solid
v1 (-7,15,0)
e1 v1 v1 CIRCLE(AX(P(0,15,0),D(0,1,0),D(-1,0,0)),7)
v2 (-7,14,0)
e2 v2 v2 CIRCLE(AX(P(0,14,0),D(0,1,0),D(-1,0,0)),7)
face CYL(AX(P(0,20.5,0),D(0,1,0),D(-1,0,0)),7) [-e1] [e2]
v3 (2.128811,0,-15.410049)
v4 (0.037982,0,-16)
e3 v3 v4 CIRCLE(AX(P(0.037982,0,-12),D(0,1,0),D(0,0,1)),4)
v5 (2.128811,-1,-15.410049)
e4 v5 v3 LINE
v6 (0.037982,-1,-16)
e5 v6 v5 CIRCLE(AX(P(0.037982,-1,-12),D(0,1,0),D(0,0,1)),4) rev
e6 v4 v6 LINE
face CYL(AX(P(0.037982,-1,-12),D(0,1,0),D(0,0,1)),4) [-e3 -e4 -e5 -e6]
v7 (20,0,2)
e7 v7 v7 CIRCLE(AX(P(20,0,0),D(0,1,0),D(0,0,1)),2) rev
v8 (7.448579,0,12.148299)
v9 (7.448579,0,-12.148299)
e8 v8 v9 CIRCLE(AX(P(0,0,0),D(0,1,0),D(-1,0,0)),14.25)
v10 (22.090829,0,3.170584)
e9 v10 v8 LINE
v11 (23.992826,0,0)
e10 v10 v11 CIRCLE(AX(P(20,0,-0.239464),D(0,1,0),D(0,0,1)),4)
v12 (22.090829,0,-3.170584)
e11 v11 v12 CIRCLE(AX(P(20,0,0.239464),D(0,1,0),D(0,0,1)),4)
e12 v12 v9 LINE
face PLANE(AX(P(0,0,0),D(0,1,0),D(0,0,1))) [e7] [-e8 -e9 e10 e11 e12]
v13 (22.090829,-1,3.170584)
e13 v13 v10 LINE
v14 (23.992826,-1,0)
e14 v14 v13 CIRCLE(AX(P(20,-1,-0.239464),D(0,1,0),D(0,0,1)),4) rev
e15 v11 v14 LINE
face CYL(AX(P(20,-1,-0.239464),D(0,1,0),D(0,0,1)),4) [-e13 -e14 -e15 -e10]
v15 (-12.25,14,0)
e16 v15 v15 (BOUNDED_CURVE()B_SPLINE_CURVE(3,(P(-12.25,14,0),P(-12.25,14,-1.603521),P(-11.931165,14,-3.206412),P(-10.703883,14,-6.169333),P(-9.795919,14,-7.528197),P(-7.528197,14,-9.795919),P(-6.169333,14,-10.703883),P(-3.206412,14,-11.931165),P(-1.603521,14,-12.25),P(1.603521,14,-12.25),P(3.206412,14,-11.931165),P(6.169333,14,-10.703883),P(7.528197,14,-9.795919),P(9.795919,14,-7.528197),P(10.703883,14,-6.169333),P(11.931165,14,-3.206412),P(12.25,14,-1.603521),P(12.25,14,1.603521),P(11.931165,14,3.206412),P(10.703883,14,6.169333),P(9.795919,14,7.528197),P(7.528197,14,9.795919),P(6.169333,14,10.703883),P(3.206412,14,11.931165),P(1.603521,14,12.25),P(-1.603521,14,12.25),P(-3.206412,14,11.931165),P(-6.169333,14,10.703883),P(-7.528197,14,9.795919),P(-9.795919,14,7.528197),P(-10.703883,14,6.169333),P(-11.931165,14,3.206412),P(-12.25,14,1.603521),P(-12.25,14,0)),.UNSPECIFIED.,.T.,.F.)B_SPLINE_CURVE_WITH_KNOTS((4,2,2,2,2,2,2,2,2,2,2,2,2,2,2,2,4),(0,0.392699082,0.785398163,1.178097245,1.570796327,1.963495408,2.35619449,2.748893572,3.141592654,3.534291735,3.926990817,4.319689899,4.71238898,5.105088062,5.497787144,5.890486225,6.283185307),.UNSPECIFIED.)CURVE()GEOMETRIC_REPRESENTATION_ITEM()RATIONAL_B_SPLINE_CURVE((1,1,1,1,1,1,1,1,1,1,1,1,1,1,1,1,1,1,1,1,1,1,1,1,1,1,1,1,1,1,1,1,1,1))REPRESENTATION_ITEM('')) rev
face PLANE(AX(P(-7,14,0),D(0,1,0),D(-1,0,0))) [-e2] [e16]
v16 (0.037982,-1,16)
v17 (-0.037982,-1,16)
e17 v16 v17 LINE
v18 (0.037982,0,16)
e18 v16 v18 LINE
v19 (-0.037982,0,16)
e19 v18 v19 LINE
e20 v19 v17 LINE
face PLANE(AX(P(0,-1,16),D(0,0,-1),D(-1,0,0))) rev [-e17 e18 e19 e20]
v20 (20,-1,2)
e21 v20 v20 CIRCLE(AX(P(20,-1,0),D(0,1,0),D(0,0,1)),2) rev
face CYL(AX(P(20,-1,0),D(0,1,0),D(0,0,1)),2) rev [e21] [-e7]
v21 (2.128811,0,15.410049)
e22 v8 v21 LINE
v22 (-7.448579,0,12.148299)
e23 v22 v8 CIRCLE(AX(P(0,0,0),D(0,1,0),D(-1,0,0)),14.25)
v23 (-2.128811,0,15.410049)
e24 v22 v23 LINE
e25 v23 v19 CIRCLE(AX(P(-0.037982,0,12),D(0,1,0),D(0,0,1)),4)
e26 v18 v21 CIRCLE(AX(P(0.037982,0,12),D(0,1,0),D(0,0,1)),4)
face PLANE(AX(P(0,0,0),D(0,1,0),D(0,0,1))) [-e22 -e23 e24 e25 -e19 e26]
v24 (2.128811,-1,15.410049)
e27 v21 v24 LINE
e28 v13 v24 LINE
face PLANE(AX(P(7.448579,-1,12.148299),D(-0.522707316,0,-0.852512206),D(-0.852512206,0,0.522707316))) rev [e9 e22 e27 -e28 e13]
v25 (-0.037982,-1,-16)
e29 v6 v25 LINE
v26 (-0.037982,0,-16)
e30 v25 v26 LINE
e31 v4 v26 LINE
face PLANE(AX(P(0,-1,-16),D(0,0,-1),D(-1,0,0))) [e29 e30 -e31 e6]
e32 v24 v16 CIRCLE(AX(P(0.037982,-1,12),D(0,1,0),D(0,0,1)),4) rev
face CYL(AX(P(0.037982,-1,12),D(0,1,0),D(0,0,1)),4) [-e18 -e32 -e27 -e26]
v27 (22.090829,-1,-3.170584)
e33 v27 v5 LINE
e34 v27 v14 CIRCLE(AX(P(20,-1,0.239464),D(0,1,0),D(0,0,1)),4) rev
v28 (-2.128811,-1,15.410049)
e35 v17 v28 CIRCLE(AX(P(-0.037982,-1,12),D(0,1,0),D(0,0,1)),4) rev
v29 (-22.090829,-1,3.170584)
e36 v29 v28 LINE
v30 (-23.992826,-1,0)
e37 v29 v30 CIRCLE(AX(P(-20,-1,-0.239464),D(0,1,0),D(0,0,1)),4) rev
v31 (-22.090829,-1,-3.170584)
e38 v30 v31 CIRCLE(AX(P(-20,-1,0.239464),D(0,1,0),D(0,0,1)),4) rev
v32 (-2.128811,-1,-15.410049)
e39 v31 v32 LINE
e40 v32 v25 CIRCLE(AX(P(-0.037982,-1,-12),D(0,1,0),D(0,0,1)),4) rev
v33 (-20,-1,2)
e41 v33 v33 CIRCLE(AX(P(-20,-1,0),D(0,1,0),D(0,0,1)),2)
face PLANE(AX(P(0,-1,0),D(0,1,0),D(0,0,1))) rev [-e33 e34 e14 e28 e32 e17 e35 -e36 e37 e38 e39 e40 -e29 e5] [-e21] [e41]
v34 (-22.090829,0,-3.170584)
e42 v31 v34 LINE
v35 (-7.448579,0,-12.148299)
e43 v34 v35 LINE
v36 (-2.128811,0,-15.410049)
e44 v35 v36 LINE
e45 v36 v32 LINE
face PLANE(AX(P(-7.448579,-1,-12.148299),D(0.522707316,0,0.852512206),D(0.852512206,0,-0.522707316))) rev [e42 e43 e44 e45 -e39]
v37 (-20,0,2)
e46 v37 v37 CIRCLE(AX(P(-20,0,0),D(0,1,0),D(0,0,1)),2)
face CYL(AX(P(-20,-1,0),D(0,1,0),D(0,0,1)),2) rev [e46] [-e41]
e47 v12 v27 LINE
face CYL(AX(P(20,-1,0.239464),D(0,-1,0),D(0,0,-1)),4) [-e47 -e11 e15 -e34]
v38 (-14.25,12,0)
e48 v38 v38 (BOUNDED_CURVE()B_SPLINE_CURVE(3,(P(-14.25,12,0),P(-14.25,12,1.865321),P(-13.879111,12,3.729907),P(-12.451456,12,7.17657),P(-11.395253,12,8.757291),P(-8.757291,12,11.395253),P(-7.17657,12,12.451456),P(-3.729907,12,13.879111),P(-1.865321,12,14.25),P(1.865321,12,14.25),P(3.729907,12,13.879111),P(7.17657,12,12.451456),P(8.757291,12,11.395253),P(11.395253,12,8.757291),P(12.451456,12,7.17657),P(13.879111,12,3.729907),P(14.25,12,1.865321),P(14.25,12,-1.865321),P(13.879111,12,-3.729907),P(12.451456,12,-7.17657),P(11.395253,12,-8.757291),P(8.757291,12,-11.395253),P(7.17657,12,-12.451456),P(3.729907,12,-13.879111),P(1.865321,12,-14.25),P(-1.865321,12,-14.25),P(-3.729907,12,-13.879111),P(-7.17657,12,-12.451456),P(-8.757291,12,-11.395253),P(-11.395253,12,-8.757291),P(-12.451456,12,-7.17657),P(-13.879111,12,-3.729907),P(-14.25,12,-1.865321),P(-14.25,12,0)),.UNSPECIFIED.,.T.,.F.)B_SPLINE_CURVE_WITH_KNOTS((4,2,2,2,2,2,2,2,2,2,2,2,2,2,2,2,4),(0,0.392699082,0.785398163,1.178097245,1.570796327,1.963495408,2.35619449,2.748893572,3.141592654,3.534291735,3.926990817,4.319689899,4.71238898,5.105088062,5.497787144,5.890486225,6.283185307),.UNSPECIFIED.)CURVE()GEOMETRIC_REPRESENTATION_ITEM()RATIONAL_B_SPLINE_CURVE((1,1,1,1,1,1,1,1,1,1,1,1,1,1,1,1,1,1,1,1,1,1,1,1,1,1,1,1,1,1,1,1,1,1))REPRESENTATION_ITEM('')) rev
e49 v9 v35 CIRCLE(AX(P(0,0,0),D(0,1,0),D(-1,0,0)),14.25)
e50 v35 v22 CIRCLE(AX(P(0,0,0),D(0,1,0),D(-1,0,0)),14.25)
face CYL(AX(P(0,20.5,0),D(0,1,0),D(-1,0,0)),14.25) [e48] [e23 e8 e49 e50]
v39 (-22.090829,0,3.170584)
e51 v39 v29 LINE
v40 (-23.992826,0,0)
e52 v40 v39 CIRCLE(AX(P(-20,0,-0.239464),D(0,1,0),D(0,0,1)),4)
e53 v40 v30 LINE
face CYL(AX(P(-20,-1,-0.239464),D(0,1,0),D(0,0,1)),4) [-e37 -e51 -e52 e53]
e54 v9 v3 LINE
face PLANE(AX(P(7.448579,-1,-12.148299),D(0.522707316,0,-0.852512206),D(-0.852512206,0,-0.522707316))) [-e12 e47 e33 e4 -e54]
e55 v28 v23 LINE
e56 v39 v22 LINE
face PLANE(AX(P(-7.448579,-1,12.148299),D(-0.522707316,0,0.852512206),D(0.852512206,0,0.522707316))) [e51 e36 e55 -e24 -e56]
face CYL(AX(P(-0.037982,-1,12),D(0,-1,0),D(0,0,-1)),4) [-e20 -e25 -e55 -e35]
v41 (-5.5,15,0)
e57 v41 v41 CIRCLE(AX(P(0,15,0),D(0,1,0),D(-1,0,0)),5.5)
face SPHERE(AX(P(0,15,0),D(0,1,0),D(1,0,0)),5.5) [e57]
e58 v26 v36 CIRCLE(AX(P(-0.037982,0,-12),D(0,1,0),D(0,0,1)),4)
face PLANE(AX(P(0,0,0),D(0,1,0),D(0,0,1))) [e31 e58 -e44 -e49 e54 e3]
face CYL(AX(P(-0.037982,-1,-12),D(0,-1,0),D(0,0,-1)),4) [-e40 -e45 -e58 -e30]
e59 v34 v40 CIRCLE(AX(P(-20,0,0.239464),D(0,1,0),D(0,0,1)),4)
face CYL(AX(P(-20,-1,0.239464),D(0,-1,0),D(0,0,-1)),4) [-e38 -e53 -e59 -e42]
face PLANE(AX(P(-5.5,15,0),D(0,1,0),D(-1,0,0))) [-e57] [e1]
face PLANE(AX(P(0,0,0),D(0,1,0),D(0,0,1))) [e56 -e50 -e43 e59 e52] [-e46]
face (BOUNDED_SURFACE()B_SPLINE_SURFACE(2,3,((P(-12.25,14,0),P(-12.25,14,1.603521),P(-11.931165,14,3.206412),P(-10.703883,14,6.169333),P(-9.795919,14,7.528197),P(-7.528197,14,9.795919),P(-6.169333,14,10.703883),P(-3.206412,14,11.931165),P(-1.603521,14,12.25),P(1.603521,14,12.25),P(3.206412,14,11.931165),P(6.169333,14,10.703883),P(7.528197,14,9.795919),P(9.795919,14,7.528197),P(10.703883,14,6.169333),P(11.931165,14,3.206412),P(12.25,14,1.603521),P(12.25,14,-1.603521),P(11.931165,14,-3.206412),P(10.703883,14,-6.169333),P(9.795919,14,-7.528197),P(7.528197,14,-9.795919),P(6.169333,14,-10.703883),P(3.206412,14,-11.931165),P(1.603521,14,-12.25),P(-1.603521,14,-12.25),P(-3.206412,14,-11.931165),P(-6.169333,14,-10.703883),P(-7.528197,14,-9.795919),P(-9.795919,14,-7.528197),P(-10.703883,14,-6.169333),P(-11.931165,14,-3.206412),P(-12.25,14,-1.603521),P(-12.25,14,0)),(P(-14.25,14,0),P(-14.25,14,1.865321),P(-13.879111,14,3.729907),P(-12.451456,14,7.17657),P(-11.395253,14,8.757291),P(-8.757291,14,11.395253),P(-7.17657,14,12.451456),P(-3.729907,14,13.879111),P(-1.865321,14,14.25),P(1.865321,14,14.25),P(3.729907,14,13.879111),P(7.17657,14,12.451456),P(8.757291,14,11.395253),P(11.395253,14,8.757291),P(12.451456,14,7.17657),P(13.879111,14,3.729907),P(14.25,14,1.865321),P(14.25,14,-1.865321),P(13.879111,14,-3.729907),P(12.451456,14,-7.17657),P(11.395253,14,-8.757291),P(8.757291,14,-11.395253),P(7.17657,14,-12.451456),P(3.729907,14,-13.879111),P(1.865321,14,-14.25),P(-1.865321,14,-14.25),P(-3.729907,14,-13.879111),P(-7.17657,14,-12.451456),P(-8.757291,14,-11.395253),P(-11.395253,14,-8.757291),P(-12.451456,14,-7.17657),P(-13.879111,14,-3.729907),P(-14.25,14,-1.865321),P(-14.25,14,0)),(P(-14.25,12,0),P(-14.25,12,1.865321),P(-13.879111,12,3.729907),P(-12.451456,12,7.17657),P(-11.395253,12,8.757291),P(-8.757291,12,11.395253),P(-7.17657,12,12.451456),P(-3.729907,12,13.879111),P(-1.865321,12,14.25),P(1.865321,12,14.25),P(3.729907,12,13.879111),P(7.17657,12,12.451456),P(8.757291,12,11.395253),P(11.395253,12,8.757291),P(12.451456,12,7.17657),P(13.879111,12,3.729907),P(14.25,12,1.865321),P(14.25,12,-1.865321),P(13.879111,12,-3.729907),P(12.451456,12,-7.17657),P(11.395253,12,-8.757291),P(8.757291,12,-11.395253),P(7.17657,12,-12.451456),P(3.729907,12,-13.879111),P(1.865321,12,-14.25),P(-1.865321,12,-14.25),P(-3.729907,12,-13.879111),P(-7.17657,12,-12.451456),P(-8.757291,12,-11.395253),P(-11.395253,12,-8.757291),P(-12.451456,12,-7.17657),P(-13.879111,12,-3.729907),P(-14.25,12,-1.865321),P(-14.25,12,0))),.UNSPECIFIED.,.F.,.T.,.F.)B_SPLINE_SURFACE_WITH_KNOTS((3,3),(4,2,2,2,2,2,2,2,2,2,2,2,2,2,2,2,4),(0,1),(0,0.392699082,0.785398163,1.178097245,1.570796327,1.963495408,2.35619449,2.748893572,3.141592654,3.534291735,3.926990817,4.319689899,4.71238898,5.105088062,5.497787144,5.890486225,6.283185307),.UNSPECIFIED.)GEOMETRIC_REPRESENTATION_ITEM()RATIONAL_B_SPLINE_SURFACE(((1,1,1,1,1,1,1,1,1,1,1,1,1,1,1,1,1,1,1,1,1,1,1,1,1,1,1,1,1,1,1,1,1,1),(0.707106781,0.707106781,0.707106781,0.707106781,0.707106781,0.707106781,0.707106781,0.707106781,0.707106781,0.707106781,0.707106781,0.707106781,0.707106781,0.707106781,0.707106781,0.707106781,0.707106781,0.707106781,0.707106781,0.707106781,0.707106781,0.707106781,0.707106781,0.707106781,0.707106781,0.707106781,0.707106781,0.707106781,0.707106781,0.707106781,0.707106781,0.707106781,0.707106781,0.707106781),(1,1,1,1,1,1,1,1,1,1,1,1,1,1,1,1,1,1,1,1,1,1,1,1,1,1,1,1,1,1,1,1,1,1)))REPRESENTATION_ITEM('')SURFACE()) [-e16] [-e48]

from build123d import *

# Parameters (mm, degrees)
FILLET_1_R      = 2
SKETCH_2_R      = 2
EXTRUDE_1_DEPTH = 1
FILLET_2_R      = 4


with BuildPart() as part:
    # 스케치1 → 회전1 (revolve)
    with BuildSketch(Plane.XY):
        with BuildLine():
            Line((-5.5, 15), (-7, 15))
            Line((-7, 15), (-7, 14))
            Line((-7, 14), (-14.25, 14))
            Line((-14.25, 14), (-14.25, 0))
            Line((-14.25, 0), (0, 0))
            Line((0, 0), (0, 20.5))
            ThreePointArc((0, 20.5), (-3.889087297, 18.889087297), (-5.5, 15))
        make_face()
    revolve(axis=Axis((0, 20.5, 0), (0, -1, 0)))

    # 필렛1
    fillet_1_edges = [part.edges().sort_by_distance(p)[0] for p in [
        (14.25, 14, 0),
    ]]
    fillet(fillet_1_edges, radius=FILLET_1_R)

    # 스케치2 → 보스-돌출1 (add)
    with BuildSketch(Plane(origin=(0, 0, 0), x_dir=(1, 0, 0), z_dir=(0, 1, 0))):
        Polygon((-1.166627447, 16), (-24, 2), (-24, -2), (-1.166627447, -16), (1.166627447, -16), (24, -2), (24, 2), (1.166627447, 16), align=None)
        with Locations(Location((-20, 0, 0), (0, 0, 270))):
            Circle(SKETCH_2_R, mode=Mode.SUBTRACT)
        with Locations(Location((20, 0, 0), (0, 0, 270))):
            Circle(SKETCH_2_R, mode=Mode.SUBTRACT)
    extrude(amount=-EXTRUDE_1_DEPTH)

    # 필렛2
    # the kernel refuses this fillet: 4 mm, written as the material it takes off along each edge
    with BuildSketch(Plane(origin=(24, 5.598660997, -2), x_dir=(-0.8525122061525764, 0, -0.5227073161539516), z_dir=(0, -1, 0)), Plane(origin=(24, 5.598660997, 2), x_dir=(0, 0, -1), z_dir=(0, -1, 0)), Plane(origin=(-24, 5.598660997, 2), x_dir=(0.852512206152576, 0, 0.5227073161539524), z_dir=(0, -1, 0)), Plane(origin=(-24, 5.598660997, -2), x_dir=(0, 0, 1), z_dir=(0, -1, 0))) as fillet_2_piece_1:
        with BuildLine():
            CenterArc((FILLET_2_R * 0.559866099748, -FILLET_2_R), FILLET_2_R, 90, 58.485971252)
            Line((-FILLET_2_R * 0.292646106405, -FILLET_2_R * 0.477292683846), (0, 0))
            Line((0, 0), (FILLET_2_R * 0.559866099748, 0))
        make_face()
    extrude(amount=12.197321995, mode=Mode.SUBTRACT)
    with BuildSketch(Plane(origin=(1.166627447, 2.821613344, 16), x_dir=(0.8525122061525761, 0, -0.5227073161539519), z_dir=(0, -1, 0)), Plane(origin=(1.166627447, 2.821613344, -16), x_dir=(-1, 0, 0), z_dir=(0, -1, 0)), Plane(origin=(-1.166627447, 2.821613344, -16), x_dir=(-0.8525122061525764, 0, 0.5227073161539515), z_dir=(0, -1, 0))) as fillet_2_piece_2:
        with BuildLine():
            CenterArc((FILLET_2_R * 0.28216133444, -FILLET_2_R), FILLET_2_R, 90, 31.514028748)
            Line((-FILLET_2_R * 0.240545981714, -FILLET_2_R * 0.147487793847), (0, 0))
            Line((0, 0), (FILLET_2_R * 0.28216133444, 0))
        make_face()
    extrude(amount=6.643226689, mode=Mode.SUBTRACT)
    with BuildSketch(Plane(origin=(-1.166627447, 2.821613344, 16), x_dir=(-0.8525122061525756, 0, -0.5227073161539529), z_dir=(0, -1, 0))) as fillet_2_piece_3:
        with BuildLine():
            CenterArc((FILLET_2_R * 0.28216133444, FILLET_2_R), FILLET_2_R, 238.485971252, 31.514028748)
            Line((-FILLET_2_R * 0.240545981714, FILLET_2_R * 0.147487793847), (0, 0))
            Line((0, 0), (FILLET_2_R * 0.28216133444, 0))
        make_face()
    extrude(amount=6.643226689, mode=Mode.SUBTRACT)


solid = part.part
